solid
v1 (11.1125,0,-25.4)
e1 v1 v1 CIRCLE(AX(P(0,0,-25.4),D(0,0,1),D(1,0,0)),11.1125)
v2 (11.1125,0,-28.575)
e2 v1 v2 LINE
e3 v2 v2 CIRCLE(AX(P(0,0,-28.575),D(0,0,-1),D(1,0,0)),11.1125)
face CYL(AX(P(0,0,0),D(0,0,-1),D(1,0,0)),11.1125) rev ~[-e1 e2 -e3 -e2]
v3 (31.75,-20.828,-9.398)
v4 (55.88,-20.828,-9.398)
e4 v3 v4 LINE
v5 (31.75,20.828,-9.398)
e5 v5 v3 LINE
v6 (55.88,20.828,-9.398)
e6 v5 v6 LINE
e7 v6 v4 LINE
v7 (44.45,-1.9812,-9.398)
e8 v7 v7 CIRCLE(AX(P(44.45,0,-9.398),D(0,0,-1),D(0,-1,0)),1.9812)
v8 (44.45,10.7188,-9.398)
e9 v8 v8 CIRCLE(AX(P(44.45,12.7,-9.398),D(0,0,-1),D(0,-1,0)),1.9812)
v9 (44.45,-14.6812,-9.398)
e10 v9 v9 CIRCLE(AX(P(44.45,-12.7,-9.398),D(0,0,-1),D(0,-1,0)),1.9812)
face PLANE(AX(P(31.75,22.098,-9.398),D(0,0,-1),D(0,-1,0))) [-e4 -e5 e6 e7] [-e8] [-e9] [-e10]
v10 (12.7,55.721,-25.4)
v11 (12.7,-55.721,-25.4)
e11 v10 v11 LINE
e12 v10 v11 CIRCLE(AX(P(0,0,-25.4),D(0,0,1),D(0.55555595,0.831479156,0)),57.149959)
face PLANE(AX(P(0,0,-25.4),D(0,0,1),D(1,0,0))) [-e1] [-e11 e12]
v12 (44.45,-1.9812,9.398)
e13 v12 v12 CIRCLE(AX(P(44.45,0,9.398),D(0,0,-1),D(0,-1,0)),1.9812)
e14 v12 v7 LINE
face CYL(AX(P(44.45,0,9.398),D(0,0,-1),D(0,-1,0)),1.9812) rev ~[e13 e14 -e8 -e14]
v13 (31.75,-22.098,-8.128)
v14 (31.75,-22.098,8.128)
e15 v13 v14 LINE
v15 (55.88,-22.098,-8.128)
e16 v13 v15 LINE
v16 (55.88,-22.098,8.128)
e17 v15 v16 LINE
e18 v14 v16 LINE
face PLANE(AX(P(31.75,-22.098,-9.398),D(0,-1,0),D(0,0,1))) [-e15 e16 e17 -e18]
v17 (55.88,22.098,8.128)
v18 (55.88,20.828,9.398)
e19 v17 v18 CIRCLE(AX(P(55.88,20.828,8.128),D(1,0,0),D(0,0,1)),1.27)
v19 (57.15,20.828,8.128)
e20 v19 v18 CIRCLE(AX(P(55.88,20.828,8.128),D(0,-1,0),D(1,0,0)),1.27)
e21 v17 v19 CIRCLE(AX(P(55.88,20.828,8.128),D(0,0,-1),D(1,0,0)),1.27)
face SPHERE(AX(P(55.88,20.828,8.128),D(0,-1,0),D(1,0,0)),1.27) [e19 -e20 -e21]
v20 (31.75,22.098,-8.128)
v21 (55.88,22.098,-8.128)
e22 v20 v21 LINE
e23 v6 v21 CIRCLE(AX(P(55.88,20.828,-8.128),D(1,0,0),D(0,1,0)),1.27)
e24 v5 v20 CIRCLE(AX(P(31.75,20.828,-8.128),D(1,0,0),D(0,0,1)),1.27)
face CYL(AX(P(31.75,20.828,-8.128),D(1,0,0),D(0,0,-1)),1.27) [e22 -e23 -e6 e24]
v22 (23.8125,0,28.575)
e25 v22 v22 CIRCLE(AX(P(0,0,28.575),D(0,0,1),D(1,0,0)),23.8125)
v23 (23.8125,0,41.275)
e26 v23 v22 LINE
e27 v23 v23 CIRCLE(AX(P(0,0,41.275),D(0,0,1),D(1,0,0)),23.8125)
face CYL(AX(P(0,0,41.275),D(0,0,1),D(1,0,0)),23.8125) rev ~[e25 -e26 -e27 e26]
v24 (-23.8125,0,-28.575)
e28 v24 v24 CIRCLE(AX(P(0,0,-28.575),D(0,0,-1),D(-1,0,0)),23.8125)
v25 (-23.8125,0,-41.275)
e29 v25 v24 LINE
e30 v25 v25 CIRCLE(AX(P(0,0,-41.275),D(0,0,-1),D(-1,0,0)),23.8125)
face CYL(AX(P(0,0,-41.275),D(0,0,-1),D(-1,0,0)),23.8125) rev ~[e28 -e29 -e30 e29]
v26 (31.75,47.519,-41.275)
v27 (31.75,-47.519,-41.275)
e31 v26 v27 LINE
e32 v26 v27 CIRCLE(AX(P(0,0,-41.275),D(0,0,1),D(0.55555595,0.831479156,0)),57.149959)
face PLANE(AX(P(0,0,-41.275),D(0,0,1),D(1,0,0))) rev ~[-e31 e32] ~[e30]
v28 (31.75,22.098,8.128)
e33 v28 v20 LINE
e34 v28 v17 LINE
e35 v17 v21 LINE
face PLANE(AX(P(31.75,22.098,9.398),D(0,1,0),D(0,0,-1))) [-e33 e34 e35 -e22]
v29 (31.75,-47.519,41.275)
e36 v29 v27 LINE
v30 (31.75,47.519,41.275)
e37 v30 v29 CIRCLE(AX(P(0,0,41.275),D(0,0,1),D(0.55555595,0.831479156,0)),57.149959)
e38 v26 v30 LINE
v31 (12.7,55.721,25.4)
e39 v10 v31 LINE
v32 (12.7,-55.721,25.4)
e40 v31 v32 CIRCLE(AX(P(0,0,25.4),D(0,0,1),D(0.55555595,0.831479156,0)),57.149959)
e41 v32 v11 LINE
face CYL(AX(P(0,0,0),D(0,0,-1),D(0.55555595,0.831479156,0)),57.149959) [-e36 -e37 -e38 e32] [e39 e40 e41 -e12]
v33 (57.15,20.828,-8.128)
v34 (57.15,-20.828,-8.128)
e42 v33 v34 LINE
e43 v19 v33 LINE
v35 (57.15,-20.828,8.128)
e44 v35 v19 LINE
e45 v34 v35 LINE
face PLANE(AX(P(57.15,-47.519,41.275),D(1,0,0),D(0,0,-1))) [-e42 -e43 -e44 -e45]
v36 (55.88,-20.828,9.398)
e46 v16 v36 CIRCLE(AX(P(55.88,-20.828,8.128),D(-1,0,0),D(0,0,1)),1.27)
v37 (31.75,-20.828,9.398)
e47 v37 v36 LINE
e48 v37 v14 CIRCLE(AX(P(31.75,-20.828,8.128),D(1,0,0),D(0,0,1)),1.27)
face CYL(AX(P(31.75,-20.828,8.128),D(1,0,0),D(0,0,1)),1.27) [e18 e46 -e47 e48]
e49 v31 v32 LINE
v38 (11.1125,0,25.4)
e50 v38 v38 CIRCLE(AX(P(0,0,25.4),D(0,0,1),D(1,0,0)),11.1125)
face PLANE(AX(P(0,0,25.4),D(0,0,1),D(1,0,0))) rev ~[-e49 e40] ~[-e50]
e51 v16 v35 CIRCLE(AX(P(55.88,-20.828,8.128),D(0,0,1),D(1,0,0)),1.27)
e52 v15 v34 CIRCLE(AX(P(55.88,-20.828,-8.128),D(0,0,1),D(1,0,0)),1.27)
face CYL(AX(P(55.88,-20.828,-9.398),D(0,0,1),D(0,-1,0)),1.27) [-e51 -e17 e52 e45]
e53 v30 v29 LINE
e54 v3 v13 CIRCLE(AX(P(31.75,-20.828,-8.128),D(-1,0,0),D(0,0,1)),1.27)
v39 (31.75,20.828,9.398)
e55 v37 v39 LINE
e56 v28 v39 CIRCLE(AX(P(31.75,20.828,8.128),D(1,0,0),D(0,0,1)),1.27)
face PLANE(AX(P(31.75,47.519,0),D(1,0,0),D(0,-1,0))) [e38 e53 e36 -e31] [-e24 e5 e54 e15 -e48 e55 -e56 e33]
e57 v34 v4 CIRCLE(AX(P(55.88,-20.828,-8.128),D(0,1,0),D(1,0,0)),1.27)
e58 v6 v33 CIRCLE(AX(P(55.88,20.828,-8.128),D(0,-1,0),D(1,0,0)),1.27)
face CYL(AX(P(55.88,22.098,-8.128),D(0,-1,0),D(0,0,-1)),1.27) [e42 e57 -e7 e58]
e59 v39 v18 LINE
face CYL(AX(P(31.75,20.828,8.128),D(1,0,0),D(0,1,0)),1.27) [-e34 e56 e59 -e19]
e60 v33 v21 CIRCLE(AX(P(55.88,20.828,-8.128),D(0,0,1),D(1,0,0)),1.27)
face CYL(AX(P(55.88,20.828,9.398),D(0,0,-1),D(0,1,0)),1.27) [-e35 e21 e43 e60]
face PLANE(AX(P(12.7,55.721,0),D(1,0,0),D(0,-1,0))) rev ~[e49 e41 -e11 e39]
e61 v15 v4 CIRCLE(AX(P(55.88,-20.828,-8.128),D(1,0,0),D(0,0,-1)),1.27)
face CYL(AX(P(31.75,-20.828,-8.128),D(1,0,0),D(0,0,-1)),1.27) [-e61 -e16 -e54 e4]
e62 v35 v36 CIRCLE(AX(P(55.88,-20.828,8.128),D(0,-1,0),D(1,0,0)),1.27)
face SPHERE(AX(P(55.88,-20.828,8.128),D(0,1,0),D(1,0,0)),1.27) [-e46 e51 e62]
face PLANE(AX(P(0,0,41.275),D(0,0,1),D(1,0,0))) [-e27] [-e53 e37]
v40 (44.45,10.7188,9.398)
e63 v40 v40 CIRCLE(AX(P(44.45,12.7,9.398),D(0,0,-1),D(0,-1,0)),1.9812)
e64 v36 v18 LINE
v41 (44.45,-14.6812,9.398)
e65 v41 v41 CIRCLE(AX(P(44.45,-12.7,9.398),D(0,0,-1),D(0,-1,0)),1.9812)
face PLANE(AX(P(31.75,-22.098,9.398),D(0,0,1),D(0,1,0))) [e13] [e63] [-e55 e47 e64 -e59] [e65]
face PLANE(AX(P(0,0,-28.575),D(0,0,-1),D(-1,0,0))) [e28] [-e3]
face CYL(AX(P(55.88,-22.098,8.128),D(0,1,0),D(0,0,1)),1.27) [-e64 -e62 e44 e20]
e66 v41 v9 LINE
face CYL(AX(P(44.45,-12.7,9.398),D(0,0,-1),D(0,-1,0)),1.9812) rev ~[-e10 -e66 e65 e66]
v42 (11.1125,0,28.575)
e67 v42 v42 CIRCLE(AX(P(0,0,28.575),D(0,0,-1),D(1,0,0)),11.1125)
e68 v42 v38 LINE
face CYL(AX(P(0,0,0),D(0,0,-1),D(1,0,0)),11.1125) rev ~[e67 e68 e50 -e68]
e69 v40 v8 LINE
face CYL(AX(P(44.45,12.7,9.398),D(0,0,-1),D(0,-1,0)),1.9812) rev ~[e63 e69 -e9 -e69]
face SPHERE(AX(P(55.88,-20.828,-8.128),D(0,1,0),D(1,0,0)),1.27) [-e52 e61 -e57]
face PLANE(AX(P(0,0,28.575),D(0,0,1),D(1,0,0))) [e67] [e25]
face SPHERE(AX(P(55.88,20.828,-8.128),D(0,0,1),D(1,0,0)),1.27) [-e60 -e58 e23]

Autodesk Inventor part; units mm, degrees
ref_plane "YZ Plane" through (0, 0, 0) normal (1, 0, 0) x (0, 1, 0)
ref_plane "XZ Plane" through (0, 0, 0) normal (0, 1, 0) x (-1, 0, 0)
ref_plane "XY Plane" through (0, 0, 0) normal (0, 0, 1) x (1, 0, 0)
sketch "Sketch1" plane through (0, 0, 0) normal (0, 0, 1) x (1, 0, 0)
  circle A0 centre (0, 0) radius 11.1125
  circle A1 centre (0, 0) radius 57.15 construction
  line L0 (29.571, 44.45) -> (35.921, 44.45) construction
  line L1 (35.921, 44.45) -> (35.921, -44.45) construction
  line L2 (35.921, -44.45) -> (29.571, -44.45) construction
  line L3 (29.571, -44.45) -> (29.571, 44.45) construction
  line L4 (31.75, 47.519) -> (31.75, -47.519)
  arc A2 (31.75, 47.519) -> (31.75, -47.519) centre (0, 0) ccw
  point P0 (29.571, 0)
  point P1 (57.15, 0)
  point P2 (35.921, 0)
  dimension "d0" = 22.225
  dimension "d2" = 114.3
  dimension "d3" = 88.9
  dimension "d4" = 6.35
  dimension "d5" = 35.921
  dimension "d6" = 21.229
  dimension "d7" = 31.75
extrude "Extrusion1" add sketch "Sketch1" along normal mid plane 82.55
sketch "Sketch3" plane through (0, 0, 41.275) normal (0, 0, 1) x (1, 0, 0)
  circle A0 centre (0, 0) radius 11.1125 construction
  arc A1 (31.75, 47.519) -> (31.75, -47.519) centre (0, 0) ccw construction
  line L0 (31.75, 47.519) -> (31.75, -47.519) construction
  circle A2 centre (0, 0) radius 11.1125 construction
  circle A3 centre (0, 0) radius 23.8125
  dimension "d10" = 47.625
extrude "Extrusion2" cut sketch "Sketch3" against normal blind 12.7
sketch "Sketch4" plane through (0, 0, -41.275) normal (0, 0, -1) x (-1, 0, 0)
  circle A0 centre (0, 0) radius 23.8125
  dimension "d13" = 47.625
extrude "Extrusion3" cut sketch "Sketch4" against normal blind 12.7
sketch "Sketch7" plane through (31.75, -47.519, 41.275) normal (1, 0, 0) x (0, 0, -1)
  line L0 (28.575, 22.119) -> (53.975, 22.119) construction
  line L1 (53.975, 22.119) -> (53.975, 72.919) construction
  line L2 (53.975, 72.919) -> (28.575, 72.919) construction
  line L3 (28.575, 72.919) -> (28.575, 22.119) construction
  line L4 (28.575, 22.119) -> (53.975, 72.919) construction
  line L5 (53.975, 22.119) -> (28.575, 72.919) construction
  line L6 (31.75, 25.294) -> (50.8, 25.294) construction
  line L7 (50.8, 25.294) -> (50.8, 69.744) construction
  line L8 (50.8, 69.744) -> (31.75, 69.744) construction
  line L9 (31.75, 69.744) -> (31.75, 25.294) construction
  line L10 (31.75, 25.294) -> (50.8, 69.744) construction
  line L11 (50.8, 25.294) -> (31.75, 69.744) construction
  line L12 (50.673, 25.421) -> (31.877, 25.421)
  line L13 (31.877, 25.421) -> (31.877, 69.617)
  line L14 (31.877, 69.617) -> (50.673, 69.617)
  line L15 (50.673, 69.617) -> (50.673, 25.421)
  line L16 (50.673, 25.421) -> (31.877, 69.617) construction
  line L17 (31.877, 25.421) -> (50.673, 69.617) construction
  point P0 (41.275, 47.519)
  dimension "d34" = 25.4
  dimension "d35" = 50.8
  dimension "d36" = 3.175
  dimension "d37" = 3.175
  dimension "d38" = 0.127
  dimension "d39" = 0.127
extrude "Extrusion5" add sketch "Sketch7" along normal blind 25.4
sketch "Sketch8" plane through (0, 0, 0) normal (0, 0, 1) x (1, 0, 0)
  circle A0 centre (0, 0) radius 11.1125 projected
  arc A1 (31.75, 47.519) -> (31.75, -47.519) centre (0, 0) ccw projected
  line L0 (31.75, 47.519) -> (31.75, 22.098) projected
  line L1 (31.75, 22.098) -> (57.15, 22.098) projected
  line L2 (57.15, 22.098) -> (57.15, -22.098) projected
  line L3 (57.15, -22.098) -> (31.75, -22.098) projected
  line L4 (31.75, -22.098) -> (31.75, -47.519) projected
  arc A2 (31.75, 47.519) -> (31.75, -47.519) centre (0, 0) ccw projected
  line L5 (12.7, 55.721) -> (12.7, -55.721)
  dimension "d42" = 12.7
extrude "Extrusion6" cut sketch "Sketch8" along normal mid plane 50.8 contours L5 A1
sketch "Sketch9" plane through (31.75, -22.098, 9.398) normal (0, 0, 1) x (1, 0, 0)
  line L0 (25.4, 44.196) -> (25.4, 0) projected
  point P0 (-31.75, 22.098)
  point P1 (12.7, 34.798)
  point P2 (12.7, 22.098)
  point P3 (12.7, 9.398)
  point P4 (25.4, 22.098)
  dimension "d45" = 12.7
  dimension "d46" = 12.7
  dimension "d47" = 12.7
hole "Hole2" at (44.45, 12.7, 9.398) at (44.45, 0, 9.398) at (44.45, -12.7, 9.398) direction (0, 0, -1) diameter 3.9624 end through all thread size "10-32 UNF" class "2B" standard "ANSI Unified Screw Threads"
fillet "Fillet1" radius 1.27 8 edges at (57.15, 0, 9.398) (57.15, 22.098, 0) (57.15, 0, -9.398) (57.15, -22.098, 0) (44.45, -22.098, 9.398) (44.45, 22.098, 9.398) (44.45, 22.098, -9.398) (44.45, -22.098, -9.398)
equation "\"d13\" = d10"
equation "\"d14\" = d11"
equation "\"d37\" = d36"
equation "\"d39\" = d38"
equation "\"d11\" = 12.7"
properties part number "EL2-A-008" material "Aluminum 6061"
